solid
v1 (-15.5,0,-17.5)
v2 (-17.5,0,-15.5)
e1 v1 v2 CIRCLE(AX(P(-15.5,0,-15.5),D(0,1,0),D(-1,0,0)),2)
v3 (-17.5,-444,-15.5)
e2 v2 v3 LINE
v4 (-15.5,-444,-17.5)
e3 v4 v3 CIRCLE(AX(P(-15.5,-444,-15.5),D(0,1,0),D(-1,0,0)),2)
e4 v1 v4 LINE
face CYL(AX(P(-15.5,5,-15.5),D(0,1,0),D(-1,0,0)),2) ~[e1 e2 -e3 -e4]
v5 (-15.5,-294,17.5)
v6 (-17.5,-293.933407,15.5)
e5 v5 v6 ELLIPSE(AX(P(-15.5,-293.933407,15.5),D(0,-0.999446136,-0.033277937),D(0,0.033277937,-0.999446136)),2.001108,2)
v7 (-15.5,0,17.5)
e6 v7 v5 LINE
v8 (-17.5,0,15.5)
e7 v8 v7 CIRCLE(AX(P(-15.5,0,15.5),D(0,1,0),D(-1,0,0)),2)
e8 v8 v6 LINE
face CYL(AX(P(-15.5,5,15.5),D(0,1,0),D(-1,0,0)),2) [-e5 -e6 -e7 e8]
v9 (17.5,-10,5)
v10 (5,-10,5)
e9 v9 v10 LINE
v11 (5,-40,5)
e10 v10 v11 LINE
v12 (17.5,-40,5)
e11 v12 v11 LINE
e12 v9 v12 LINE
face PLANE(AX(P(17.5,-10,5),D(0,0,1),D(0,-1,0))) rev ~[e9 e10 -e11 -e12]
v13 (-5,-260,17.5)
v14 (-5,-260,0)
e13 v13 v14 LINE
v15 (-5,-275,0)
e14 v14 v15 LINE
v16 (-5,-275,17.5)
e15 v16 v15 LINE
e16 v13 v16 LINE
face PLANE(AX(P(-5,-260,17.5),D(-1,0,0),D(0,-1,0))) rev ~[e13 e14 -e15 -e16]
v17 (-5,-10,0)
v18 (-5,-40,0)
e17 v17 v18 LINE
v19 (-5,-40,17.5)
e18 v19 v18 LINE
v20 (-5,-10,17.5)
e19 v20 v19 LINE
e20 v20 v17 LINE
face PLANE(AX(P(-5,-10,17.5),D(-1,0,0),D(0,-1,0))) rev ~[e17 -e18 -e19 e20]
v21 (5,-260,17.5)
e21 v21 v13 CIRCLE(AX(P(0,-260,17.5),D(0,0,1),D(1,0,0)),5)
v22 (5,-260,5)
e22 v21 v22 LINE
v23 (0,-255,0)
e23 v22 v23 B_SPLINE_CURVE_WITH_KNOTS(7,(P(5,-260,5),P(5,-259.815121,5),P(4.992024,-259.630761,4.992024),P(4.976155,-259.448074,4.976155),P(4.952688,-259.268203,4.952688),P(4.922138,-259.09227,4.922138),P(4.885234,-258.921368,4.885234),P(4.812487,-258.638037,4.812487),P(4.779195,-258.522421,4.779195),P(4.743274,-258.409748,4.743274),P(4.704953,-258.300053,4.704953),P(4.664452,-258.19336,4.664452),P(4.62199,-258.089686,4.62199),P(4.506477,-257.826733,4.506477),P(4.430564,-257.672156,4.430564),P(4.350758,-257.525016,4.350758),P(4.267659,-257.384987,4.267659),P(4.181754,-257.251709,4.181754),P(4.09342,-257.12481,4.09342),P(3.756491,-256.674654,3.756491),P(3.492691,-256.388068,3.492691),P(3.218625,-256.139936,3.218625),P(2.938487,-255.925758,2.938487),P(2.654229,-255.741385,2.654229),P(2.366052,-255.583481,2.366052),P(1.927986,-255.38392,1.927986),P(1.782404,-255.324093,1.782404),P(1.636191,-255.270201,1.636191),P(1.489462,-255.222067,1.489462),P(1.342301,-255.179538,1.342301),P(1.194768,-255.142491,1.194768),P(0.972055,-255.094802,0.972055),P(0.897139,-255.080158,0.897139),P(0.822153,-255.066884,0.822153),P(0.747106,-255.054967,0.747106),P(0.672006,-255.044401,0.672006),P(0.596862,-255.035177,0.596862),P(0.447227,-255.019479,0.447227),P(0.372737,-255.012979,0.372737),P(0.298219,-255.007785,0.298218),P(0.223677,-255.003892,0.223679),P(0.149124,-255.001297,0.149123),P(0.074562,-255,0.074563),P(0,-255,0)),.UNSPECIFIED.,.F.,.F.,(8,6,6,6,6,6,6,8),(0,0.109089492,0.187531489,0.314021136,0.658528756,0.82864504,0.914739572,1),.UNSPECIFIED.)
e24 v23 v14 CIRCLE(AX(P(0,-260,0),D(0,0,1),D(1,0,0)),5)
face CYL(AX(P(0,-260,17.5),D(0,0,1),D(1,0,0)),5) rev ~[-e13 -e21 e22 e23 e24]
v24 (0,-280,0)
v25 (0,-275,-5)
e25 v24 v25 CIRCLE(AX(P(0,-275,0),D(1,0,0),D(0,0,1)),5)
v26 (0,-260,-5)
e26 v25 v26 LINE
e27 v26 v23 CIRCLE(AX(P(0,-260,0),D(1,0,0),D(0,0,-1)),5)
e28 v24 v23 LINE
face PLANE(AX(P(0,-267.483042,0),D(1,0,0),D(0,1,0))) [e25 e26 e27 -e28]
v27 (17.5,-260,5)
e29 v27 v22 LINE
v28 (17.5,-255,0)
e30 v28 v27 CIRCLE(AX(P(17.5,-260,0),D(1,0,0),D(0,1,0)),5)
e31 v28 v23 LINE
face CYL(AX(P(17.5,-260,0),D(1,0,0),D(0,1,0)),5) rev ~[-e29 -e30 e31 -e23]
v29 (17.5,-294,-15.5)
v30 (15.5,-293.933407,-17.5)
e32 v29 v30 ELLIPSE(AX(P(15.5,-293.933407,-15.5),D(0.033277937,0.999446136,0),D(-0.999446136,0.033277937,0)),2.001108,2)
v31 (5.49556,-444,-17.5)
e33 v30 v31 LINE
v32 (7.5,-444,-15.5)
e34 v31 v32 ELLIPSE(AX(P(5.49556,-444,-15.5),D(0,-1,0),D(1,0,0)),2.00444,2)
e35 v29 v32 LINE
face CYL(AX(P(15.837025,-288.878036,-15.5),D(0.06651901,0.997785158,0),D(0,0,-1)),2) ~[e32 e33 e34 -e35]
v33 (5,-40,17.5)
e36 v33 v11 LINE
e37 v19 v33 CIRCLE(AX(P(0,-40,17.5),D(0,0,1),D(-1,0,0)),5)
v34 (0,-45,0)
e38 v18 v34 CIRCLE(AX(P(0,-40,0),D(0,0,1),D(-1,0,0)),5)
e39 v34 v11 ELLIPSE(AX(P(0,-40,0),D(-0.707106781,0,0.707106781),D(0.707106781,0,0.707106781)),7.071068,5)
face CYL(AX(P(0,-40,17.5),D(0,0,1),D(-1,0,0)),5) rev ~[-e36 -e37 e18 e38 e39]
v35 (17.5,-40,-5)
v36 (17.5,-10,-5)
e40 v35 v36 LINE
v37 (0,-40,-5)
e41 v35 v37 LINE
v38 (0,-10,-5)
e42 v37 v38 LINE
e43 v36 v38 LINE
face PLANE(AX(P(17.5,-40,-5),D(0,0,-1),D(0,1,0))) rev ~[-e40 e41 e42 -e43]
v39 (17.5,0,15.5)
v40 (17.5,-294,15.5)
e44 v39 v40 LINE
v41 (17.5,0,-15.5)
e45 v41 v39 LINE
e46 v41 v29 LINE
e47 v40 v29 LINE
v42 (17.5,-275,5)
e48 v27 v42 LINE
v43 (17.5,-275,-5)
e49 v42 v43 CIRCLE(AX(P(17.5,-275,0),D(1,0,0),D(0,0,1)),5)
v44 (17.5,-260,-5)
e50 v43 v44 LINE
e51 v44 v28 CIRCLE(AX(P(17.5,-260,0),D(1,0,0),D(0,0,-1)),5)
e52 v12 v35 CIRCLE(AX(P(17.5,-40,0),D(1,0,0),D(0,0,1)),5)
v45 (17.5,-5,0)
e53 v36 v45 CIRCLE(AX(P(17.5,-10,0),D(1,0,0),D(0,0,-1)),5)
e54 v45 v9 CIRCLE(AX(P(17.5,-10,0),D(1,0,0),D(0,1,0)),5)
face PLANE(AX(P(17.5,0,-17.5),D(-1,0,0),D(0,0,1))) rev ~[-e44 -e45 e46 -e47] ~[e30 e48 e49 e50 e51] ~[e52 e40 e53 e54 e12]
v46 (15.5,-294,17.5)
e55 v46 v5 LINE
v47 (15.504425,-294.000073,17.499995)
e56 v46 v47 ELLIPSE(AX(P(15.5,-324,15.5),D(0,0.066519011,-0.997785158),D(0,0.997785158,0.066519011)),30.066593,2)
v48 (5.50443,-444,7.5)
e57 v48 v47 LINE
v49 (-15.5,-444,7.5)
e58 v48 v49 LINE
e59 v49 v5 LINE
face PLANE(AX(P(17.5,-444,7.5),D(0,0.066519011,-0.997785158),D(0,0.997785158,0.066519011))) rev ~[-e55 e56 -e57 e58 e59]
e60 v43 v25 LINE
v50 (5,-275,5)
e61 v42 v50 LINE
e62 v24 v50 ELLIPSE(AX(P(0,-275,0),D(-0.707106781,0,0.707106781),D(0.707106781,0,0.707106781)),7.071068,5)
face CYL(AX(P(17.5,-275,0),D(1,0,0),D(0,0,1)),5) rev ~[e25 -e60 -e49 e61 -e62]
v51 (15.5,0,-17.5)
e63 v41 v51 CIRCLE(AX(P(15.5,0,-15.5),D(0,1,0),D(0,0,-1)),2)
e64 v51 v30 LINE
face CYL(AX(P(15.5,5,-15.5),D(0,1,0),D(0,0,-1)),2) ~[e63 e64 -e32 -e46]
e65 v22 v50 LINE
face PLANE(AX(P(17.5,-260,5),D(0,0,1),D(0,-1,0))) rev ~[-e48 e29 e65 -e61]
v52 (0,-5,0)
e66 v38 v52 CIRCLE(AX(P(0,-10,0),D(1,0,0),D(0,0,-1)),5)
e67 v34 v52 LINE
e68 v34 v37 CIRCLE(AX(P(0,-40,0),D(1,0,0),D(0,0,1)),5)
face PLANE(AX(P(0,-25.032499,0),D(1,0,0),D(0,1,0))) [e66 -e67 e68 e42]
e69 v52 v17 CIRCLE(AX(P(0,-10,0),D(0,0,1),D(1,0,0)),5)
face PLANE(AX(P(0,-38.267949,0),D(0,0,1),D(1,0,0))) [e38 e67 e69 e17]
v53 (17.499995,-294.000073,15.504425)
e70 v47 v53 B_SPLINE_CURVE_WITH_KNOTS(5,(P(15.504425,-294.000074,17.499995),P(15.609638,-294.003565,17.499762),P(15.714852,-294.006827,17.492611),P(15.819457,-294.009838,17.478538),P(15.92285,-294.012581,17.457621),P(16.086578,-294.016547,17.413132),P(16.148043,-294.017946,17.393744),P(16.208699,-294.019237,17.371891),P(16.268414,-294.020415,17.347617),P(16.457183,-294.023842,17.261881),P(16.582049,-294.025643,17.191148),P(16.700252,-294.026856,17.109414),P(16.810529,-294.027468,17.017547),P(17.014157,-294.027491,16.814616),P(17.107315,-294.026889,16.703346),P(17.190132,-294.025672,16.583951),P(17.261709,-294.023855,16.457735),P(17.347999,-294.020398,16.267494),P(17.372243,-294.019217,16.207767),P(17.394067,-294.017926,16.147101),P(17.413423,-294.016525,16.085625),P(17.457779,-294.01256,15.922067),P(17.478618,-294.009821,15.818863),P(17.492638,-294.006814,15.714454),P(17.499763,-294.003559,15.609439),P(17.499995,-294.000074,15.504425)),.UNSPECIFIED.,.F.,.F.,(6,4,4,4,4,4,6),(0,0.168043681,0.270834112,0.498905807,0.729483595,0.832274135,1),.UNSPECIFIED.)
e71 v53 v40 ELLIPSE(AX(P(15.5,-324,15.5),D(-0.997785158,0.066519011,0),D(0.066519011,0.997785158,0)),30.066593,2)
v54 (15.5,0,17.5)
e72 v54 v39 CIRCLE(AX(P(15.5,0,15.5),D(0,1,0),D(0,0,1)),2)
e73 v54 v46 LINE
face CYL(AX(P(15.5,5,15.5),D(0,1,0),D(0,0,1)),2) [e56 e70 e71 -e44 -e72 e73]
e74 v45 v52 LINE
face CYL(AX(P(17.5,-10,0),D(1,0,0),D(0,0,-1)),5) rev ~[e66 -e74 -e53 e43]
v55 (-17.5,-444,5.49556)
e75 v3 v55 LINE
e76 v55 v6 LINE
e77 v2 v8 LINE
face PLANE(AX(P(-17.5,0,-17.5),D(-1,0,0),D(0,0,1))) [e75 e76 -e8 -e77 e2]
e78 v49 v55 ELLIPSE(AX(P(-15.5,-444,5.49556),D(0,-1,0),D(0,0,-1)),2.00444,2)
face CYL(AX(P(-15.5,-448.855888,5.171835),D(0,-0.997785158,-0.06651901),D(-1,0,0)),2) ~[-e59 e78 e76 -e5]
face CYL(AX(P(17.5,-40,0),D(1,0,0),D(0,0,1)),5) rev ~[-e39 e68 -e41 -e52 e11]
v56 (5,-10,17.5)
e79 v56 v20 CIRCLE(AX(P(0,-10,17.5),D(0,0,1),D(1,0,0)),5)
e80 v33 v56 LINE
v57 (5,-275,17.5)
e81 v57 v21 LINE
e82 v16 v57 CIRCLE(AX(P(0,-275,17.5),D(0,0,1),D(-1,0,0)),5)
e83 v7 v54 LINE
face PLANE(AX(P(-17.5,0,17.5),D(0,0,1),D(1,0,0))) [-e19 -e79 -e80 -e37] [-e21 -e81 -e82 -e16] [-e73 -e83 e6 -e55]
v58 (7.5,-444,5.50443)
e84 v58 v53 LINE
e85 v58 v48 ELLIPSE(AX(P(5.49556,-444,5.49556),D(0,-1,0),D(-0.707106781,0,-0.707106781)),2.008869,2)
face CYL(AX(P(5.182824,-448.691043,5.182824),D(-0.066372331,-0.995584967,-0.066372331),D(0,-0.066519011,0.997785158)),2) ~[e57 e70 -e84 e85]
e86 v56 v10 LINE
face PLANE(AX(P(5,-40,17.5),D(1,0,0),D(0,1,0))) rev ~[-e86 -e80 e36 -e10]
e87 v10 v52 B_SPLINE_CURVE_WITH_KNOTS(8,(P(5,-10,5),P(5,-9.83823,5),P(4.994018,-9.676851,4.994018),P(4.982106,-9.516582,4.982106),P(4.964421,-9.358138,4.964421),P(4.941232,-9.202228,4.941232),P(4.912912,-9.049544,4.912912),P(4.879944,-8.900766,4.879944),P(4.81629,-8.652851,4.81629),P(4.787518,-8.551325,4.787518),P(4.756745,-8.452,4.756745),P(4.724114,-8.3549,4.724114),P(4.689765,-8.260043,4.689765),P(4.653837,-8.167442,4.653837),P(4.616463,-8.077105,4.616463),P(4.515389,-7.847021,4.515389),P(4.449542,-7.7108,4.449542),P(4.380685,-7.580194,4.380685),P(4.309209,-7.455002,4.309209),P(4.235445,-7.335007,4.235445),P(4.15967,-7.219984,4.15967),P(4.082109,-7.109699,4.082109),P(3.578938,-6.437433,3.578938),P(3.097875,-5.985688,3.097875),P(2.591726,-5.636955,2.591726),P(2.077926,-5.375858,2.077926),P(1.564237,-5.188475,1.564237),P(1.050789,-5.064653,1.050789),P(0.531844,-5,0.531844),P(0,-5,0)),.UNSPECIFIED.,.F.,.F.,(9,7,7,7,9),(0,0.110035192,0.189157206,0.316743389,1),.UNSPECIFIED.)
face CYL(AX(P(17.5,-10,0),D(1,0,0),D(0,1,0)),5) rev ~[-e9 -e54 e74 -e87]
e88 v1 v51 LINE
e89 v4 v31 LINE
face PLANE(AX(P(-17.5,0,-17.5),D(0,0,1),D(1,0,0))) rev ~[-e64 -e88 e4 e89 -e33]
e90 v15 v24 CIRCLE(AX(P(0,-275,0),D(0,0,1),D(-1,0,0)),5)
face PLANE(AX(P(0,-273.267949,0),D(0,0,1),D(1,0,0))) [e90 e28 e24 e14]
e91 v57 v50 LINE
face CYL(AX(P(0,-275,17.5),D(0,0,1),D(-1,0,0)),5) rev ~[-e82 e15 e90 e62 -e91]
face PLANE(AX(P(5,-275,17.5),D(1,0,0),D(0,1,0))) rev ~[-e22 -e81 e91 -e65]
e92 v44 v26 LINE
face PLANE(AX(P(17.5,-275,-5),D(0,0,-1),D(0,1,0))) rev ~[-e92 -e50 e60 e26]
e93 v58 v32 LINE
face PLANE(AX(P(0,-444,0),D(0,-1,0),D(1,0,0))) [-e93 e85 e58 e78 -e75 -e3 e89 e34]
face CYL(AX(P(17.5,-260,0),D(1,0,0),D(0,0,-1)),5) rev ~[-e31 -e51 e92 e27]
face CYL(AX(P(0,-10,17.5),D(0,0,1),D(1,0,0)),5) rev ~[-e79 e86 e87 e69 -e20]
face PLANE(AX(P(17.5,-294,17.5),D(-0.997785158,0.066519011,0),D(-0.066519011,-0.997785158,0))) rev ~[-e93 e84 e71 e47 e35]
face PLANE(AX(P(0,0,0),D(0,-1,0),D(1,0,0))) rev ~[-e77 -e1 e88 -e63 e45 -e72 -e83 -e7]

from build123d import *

# Parameters (mm, degrees)
F0_W         = 35
F0_H         = 35
F1_DEPTH     = 444
F3_DEPTH     = 35
F5_DEPTH     = 35
F7_DEPTH     = 17.5
F10_DEPTH    = 17.5
F11_T1_DEPTH = 160.3329637837
F11_T3_DEPTH = 304
F11_T5_DEPTH = 160.3329637837
F11_T7_DEPTH = 160.6210414072
F11_T9_DEPTH = 454


# Not quite as in the source:
# - a fillet or chamfer that OpenCascade refuses, or shapes differently, is made with other operations: its cross-section is extruded or revolved along the edge and cut away or added


with BuildPart() as f1:
    # F0 (on Front) → F1 (new body)
    with BuildSketch(Plane.XZ):
        Rectangle(F0_W, F0_H)
    extrude(amount=F1_DEPTH)

    # F2 (on face) → F3 (cut)
    with BuildSketch(Plane.YZ.offset(17.5)):
        Polygon((-444, 7.5), (-294, 17.5), (-444, 17.5), align=None)
    extrude(amount=-F3_DEPTH, mode=Mode.SUBTRACT)

    # F4 (on face) → F5 (cut)
    with BuildSketch(Plane.XY.offset(17.5)):
        Polygon((17.5, -444), (17.5, -294), (7.5, -444), align=None)
    extrude(amount=-F5_DEPTH, mode=Mode.SUBTRACT)

    # F6 (on face) → F7 (cut)
    with BuildSketch(Plane.XY.offset(17.5)):
        with BuildLine():
            ThreePointArc((5, -275), (0, -270), (-5, -275))
            Line((-5, -275), (5, -275))
        make_face()
        with BuildLine():
            Line((-5, -260), (-5, -275))
            ThreePointArc((-5, -275), (0, -270), (5, -275))
            Line((5, -275), (5, -260))
            ThreePointArc((5, -260), (0, -265), (-5, -260))
        make_face()
        with BuildLine():
            Line((5, -275), (-5, -275))
            ThreePointArc((-5, -275), (0, -280), (5, -275))
        make_face()
        with BuildLine():
            ThreePointArc((5, -260), (0, -255), (-5, -260))
            Line((-5, -260), (5, -260))
        make_face()
        with BuildLine():
            Line((5, -260), (-5, -260))
            ThreePointArc((-5, -260), (0, -265), (5, -260))
        make_face()
        with BuildLine():
            ThreePointArc((5, -40), (0, -35), (-5, -40))
            Line((-5, -40), (5, -40))
        make_face()
        with BuildLine():
            Line((-5, -10), (-5, -40))
            ThreePointArc((-5, -40), (0, -35), (5, -40))
            Line((5, -40), (5, -10))
            ThreePointArc((5, -10), (0, -15), (-5, -10))
        make_face()
        with BuildLine():
            Line((5, -40), (-5, -40))
            ThreePointArc((-5, -40), (0, -45), (5, -40))
        make_face()
        with BuildLine():
            ThreePointArc((5, -10), (0, -5), (-5, -10))
            Line((-5, -10), (5, -10))
        make_face()
        with BuildLine():
            Line((5, -10), (-5, -10))
            ThreePointArc((-5, -10), (0, -15), (5, -10))
        make_face()
    extrude(amount=-F7_DEPTH, mode=Mode.SUBTRACT)

    # F9 (on face) → F10 (cut)
    with BuildSketch(Plane.YZ.offset(17.5)):
        with BuildLine():
            ThreePointArc((-270, 0), (-271.4644660941, -3.5355339059), (-275, -5))
            Line((-275, -5), (-260, -5))
            ThreePointArc((-260, -5), (-265, 0), (-260, 5))
            Line((-260, 5), (-275, 5))
            ThreePointArc((-275, 5), (-271.4644660941, 3.5355339059), (-270, 0))
        make_face()
        with BuildLine():
            ThreePointArc((-275, 5), (-280, 0), (-275, -5))
            Line((-275, -5), (-275, 5))
        make_face()
        with BuildLine():
            Line((-275, 5), (-275, -5))
            ThreePointArc((-275, -5), (-271.4644660941, -3.5355339059), (-270, 0))
            ThreePointArc((-270, 0), (-271.4644660941, 3.5355339059), (-275, 5))
        make_face()
        with BuildLine():
            ThreePointArc((-260, 5), (-265, 0), (-260, -5))
            Line((-260, -5), (-260, 5))
        make_face()
        with BuildLine():
            Line((-260, 5), (-260, -5))
            ThreePointArc((-260, -5), (-256.4644660941, -3.5355339059), (-255, 0))
            ThreePointArc((-255, 0), (-256.4644660941, 3.5355339059), (-260, 5))
        make_face()
        with BuildLine():
            ThreePointArc((-35, 0), (-36.4644660941, -3.5355339059), (-40, -5))
            Line((-40, -5), (-10, -5))
            ThreePointArc((-10, -5), (-15, 0), (-10, 5))
            Line((-10, 5), (-40, 5))
            ThreePointArc((-40, 5), (-36.4644660941, 3.5355339059), (-35, 0))
        make_face()
        with BuildLine():
            ThreePointArc((-40, 5), (-45, 0), (-40, -5))
            Line((-40, -5), (-40, 5))
        make_face()
        with BuildLine():
            Line((-40, 5), (-40, -5))
            ThreePointArc((-40, -5), (-36.4644660941, -3.5355339059), (-35, 0))
            ThreePointArc((-35, 0), (-36.4644660941, 3.5355339059), (-40, 5))
        make_face()
        with BuildLine():
            ThreePointArc((-10, 5), (-15, 0), (-10, -5))
            Line((-10, -5), (-10, 5))
        make_face()
        with BuildLine():
            Line((-10, 5), (-10, -5))
            ThreePointArc((-10, -5), (-6.4644660941, -3.5355339059), (-5, 0))
            ThreePointArc((-5, 0), (-6.4644660941, 3.5355339059), (-10, 5))
        make_face()
    extrude(amount=-F10_DEPTH, mode=Mode.SUBTRACT)

    # F11: fillet of radius 2 on 7 edges, made by hand

    # F11_s2 → F11_t1 (cut)
    with BuildSketch(Plane(origin=(0, -446.5265364088, -29.7684357606), x_dir=(1, 0, 0), z_dir=(0, 0.9977851579, 0.0665190105))):
        with BuildLine():
            ThreePointArc((-17.5, -35.0178293565), (-16.9142135624, -36.4320429189), (-15.5, -37.0178293565))
            Line((-15.5, -37.0178293565), (-17.5, -37.0178293565))
            Line((-17.5, -37.0178293565), (-17.5, -35.0178293565))
        make_face()
    extrude(amount=F11_T1_DEPTH, mode=Mode.SUBTRACT)

    # F11_s4 → F11_t3 (cut)
    with BuildSketch(Plane.XZ.offset(-5)):
        with BuildLine():
            ThreePointArc((-17.5, 15.5), (-16.9142135624, 16.9142135624), (-15.5, 17.5))
            Line((-15.5, 17.5), (-17.5, 17.5))
            Line((-17.5, 17.5), (-17.5, 15.5))
        make_face()
        with BuildLine():
            ThreePointArc((15.5, 17.5), (16.9142135624, 16.9142135624), (17.5, 15.5))
            Line((17.5, 15.5), (17.5, 17.5))
            Line((17.5, 17.5), (15.5, 17.5))
        make_face()
        with BuildLine():
            ThreePointArc((15.5, -17.5), (16.9142135624, -16.9142135624), (17.5, -15.5))
            Line((17.5, -15.5), (17.5, -17.5))
            Line((17.5, -17.5), (15.5, -17.5))
        make_face()
    extrude(amount=F11_T3_DEPTH, mode=Mode.SUBTRACT)

    # F11_s6 → F11_t5 (cut)
    with BuildSketch(Plane(origin=(-19.1032456553, -286.5486848302, 0), x_dir=(0, 0, 1), z_dir=(-0.0665190105, -0.9977851579, 0))):
        with BuildLine():
            ThreePointArc((-17.5, -35.0178293565), (-16.9142135624, -36.4320429189), (-15.5, -37.0178293565))
            Line((-15.5, -37.0178293565), (-17.5, -37.0178293565))
            Line((-17.5, -37.0178293565), (-17.5, -35.0178293565))
        make_face()
    extrude(amount=F11_T5_DEPTH, mode=Mode.SUBTRACT)

    # F11_s8 → F11_t7 (cut)
    with BuildSketch(Plane(origin=(-29.6035242291, -444.0528634361, -29.6035242291), x_dir=(-0.9977851579, 0.0665190105, 0), z_dir=(0.0663723312, 0.9955849674, 0.0663723312))):
        with BuildLine():
            ThreePointArc((-35.026678914, 36.8632049195), (-36.4351682565, 36.2743058009), (-37.0178293565, 34.8632244983))
            Line((-37.0178293565, 34.8632244983), (-37.0178293565, 36.8543944331))
            Line((-37.0178293565, 36.8543944331), (-35.026678914, 36.8632049195))
        make_face()
    extrude(amount=F11_T7_DEPTH, mode=Mode.SUBTRACT)

    # F11_s10 → F11_t9 (cut)
    with BuildSketch(Plane.XZ.offset(-5)):
        with BuildLine():
            ThreePointArc((-17.5, -15.5), (-16.9142135624, -16.9142135624), (-15.5, -17.5))
            Line((-15.5, -17.5), (-17.5, -17.5))
            Line((-17.5, -17.5), (-17.5, -15.5))
        make_face()
    extrude(amount=F11_T9_DEPTH, mode=Mode.SUBTRACT)


solid = f1.part
